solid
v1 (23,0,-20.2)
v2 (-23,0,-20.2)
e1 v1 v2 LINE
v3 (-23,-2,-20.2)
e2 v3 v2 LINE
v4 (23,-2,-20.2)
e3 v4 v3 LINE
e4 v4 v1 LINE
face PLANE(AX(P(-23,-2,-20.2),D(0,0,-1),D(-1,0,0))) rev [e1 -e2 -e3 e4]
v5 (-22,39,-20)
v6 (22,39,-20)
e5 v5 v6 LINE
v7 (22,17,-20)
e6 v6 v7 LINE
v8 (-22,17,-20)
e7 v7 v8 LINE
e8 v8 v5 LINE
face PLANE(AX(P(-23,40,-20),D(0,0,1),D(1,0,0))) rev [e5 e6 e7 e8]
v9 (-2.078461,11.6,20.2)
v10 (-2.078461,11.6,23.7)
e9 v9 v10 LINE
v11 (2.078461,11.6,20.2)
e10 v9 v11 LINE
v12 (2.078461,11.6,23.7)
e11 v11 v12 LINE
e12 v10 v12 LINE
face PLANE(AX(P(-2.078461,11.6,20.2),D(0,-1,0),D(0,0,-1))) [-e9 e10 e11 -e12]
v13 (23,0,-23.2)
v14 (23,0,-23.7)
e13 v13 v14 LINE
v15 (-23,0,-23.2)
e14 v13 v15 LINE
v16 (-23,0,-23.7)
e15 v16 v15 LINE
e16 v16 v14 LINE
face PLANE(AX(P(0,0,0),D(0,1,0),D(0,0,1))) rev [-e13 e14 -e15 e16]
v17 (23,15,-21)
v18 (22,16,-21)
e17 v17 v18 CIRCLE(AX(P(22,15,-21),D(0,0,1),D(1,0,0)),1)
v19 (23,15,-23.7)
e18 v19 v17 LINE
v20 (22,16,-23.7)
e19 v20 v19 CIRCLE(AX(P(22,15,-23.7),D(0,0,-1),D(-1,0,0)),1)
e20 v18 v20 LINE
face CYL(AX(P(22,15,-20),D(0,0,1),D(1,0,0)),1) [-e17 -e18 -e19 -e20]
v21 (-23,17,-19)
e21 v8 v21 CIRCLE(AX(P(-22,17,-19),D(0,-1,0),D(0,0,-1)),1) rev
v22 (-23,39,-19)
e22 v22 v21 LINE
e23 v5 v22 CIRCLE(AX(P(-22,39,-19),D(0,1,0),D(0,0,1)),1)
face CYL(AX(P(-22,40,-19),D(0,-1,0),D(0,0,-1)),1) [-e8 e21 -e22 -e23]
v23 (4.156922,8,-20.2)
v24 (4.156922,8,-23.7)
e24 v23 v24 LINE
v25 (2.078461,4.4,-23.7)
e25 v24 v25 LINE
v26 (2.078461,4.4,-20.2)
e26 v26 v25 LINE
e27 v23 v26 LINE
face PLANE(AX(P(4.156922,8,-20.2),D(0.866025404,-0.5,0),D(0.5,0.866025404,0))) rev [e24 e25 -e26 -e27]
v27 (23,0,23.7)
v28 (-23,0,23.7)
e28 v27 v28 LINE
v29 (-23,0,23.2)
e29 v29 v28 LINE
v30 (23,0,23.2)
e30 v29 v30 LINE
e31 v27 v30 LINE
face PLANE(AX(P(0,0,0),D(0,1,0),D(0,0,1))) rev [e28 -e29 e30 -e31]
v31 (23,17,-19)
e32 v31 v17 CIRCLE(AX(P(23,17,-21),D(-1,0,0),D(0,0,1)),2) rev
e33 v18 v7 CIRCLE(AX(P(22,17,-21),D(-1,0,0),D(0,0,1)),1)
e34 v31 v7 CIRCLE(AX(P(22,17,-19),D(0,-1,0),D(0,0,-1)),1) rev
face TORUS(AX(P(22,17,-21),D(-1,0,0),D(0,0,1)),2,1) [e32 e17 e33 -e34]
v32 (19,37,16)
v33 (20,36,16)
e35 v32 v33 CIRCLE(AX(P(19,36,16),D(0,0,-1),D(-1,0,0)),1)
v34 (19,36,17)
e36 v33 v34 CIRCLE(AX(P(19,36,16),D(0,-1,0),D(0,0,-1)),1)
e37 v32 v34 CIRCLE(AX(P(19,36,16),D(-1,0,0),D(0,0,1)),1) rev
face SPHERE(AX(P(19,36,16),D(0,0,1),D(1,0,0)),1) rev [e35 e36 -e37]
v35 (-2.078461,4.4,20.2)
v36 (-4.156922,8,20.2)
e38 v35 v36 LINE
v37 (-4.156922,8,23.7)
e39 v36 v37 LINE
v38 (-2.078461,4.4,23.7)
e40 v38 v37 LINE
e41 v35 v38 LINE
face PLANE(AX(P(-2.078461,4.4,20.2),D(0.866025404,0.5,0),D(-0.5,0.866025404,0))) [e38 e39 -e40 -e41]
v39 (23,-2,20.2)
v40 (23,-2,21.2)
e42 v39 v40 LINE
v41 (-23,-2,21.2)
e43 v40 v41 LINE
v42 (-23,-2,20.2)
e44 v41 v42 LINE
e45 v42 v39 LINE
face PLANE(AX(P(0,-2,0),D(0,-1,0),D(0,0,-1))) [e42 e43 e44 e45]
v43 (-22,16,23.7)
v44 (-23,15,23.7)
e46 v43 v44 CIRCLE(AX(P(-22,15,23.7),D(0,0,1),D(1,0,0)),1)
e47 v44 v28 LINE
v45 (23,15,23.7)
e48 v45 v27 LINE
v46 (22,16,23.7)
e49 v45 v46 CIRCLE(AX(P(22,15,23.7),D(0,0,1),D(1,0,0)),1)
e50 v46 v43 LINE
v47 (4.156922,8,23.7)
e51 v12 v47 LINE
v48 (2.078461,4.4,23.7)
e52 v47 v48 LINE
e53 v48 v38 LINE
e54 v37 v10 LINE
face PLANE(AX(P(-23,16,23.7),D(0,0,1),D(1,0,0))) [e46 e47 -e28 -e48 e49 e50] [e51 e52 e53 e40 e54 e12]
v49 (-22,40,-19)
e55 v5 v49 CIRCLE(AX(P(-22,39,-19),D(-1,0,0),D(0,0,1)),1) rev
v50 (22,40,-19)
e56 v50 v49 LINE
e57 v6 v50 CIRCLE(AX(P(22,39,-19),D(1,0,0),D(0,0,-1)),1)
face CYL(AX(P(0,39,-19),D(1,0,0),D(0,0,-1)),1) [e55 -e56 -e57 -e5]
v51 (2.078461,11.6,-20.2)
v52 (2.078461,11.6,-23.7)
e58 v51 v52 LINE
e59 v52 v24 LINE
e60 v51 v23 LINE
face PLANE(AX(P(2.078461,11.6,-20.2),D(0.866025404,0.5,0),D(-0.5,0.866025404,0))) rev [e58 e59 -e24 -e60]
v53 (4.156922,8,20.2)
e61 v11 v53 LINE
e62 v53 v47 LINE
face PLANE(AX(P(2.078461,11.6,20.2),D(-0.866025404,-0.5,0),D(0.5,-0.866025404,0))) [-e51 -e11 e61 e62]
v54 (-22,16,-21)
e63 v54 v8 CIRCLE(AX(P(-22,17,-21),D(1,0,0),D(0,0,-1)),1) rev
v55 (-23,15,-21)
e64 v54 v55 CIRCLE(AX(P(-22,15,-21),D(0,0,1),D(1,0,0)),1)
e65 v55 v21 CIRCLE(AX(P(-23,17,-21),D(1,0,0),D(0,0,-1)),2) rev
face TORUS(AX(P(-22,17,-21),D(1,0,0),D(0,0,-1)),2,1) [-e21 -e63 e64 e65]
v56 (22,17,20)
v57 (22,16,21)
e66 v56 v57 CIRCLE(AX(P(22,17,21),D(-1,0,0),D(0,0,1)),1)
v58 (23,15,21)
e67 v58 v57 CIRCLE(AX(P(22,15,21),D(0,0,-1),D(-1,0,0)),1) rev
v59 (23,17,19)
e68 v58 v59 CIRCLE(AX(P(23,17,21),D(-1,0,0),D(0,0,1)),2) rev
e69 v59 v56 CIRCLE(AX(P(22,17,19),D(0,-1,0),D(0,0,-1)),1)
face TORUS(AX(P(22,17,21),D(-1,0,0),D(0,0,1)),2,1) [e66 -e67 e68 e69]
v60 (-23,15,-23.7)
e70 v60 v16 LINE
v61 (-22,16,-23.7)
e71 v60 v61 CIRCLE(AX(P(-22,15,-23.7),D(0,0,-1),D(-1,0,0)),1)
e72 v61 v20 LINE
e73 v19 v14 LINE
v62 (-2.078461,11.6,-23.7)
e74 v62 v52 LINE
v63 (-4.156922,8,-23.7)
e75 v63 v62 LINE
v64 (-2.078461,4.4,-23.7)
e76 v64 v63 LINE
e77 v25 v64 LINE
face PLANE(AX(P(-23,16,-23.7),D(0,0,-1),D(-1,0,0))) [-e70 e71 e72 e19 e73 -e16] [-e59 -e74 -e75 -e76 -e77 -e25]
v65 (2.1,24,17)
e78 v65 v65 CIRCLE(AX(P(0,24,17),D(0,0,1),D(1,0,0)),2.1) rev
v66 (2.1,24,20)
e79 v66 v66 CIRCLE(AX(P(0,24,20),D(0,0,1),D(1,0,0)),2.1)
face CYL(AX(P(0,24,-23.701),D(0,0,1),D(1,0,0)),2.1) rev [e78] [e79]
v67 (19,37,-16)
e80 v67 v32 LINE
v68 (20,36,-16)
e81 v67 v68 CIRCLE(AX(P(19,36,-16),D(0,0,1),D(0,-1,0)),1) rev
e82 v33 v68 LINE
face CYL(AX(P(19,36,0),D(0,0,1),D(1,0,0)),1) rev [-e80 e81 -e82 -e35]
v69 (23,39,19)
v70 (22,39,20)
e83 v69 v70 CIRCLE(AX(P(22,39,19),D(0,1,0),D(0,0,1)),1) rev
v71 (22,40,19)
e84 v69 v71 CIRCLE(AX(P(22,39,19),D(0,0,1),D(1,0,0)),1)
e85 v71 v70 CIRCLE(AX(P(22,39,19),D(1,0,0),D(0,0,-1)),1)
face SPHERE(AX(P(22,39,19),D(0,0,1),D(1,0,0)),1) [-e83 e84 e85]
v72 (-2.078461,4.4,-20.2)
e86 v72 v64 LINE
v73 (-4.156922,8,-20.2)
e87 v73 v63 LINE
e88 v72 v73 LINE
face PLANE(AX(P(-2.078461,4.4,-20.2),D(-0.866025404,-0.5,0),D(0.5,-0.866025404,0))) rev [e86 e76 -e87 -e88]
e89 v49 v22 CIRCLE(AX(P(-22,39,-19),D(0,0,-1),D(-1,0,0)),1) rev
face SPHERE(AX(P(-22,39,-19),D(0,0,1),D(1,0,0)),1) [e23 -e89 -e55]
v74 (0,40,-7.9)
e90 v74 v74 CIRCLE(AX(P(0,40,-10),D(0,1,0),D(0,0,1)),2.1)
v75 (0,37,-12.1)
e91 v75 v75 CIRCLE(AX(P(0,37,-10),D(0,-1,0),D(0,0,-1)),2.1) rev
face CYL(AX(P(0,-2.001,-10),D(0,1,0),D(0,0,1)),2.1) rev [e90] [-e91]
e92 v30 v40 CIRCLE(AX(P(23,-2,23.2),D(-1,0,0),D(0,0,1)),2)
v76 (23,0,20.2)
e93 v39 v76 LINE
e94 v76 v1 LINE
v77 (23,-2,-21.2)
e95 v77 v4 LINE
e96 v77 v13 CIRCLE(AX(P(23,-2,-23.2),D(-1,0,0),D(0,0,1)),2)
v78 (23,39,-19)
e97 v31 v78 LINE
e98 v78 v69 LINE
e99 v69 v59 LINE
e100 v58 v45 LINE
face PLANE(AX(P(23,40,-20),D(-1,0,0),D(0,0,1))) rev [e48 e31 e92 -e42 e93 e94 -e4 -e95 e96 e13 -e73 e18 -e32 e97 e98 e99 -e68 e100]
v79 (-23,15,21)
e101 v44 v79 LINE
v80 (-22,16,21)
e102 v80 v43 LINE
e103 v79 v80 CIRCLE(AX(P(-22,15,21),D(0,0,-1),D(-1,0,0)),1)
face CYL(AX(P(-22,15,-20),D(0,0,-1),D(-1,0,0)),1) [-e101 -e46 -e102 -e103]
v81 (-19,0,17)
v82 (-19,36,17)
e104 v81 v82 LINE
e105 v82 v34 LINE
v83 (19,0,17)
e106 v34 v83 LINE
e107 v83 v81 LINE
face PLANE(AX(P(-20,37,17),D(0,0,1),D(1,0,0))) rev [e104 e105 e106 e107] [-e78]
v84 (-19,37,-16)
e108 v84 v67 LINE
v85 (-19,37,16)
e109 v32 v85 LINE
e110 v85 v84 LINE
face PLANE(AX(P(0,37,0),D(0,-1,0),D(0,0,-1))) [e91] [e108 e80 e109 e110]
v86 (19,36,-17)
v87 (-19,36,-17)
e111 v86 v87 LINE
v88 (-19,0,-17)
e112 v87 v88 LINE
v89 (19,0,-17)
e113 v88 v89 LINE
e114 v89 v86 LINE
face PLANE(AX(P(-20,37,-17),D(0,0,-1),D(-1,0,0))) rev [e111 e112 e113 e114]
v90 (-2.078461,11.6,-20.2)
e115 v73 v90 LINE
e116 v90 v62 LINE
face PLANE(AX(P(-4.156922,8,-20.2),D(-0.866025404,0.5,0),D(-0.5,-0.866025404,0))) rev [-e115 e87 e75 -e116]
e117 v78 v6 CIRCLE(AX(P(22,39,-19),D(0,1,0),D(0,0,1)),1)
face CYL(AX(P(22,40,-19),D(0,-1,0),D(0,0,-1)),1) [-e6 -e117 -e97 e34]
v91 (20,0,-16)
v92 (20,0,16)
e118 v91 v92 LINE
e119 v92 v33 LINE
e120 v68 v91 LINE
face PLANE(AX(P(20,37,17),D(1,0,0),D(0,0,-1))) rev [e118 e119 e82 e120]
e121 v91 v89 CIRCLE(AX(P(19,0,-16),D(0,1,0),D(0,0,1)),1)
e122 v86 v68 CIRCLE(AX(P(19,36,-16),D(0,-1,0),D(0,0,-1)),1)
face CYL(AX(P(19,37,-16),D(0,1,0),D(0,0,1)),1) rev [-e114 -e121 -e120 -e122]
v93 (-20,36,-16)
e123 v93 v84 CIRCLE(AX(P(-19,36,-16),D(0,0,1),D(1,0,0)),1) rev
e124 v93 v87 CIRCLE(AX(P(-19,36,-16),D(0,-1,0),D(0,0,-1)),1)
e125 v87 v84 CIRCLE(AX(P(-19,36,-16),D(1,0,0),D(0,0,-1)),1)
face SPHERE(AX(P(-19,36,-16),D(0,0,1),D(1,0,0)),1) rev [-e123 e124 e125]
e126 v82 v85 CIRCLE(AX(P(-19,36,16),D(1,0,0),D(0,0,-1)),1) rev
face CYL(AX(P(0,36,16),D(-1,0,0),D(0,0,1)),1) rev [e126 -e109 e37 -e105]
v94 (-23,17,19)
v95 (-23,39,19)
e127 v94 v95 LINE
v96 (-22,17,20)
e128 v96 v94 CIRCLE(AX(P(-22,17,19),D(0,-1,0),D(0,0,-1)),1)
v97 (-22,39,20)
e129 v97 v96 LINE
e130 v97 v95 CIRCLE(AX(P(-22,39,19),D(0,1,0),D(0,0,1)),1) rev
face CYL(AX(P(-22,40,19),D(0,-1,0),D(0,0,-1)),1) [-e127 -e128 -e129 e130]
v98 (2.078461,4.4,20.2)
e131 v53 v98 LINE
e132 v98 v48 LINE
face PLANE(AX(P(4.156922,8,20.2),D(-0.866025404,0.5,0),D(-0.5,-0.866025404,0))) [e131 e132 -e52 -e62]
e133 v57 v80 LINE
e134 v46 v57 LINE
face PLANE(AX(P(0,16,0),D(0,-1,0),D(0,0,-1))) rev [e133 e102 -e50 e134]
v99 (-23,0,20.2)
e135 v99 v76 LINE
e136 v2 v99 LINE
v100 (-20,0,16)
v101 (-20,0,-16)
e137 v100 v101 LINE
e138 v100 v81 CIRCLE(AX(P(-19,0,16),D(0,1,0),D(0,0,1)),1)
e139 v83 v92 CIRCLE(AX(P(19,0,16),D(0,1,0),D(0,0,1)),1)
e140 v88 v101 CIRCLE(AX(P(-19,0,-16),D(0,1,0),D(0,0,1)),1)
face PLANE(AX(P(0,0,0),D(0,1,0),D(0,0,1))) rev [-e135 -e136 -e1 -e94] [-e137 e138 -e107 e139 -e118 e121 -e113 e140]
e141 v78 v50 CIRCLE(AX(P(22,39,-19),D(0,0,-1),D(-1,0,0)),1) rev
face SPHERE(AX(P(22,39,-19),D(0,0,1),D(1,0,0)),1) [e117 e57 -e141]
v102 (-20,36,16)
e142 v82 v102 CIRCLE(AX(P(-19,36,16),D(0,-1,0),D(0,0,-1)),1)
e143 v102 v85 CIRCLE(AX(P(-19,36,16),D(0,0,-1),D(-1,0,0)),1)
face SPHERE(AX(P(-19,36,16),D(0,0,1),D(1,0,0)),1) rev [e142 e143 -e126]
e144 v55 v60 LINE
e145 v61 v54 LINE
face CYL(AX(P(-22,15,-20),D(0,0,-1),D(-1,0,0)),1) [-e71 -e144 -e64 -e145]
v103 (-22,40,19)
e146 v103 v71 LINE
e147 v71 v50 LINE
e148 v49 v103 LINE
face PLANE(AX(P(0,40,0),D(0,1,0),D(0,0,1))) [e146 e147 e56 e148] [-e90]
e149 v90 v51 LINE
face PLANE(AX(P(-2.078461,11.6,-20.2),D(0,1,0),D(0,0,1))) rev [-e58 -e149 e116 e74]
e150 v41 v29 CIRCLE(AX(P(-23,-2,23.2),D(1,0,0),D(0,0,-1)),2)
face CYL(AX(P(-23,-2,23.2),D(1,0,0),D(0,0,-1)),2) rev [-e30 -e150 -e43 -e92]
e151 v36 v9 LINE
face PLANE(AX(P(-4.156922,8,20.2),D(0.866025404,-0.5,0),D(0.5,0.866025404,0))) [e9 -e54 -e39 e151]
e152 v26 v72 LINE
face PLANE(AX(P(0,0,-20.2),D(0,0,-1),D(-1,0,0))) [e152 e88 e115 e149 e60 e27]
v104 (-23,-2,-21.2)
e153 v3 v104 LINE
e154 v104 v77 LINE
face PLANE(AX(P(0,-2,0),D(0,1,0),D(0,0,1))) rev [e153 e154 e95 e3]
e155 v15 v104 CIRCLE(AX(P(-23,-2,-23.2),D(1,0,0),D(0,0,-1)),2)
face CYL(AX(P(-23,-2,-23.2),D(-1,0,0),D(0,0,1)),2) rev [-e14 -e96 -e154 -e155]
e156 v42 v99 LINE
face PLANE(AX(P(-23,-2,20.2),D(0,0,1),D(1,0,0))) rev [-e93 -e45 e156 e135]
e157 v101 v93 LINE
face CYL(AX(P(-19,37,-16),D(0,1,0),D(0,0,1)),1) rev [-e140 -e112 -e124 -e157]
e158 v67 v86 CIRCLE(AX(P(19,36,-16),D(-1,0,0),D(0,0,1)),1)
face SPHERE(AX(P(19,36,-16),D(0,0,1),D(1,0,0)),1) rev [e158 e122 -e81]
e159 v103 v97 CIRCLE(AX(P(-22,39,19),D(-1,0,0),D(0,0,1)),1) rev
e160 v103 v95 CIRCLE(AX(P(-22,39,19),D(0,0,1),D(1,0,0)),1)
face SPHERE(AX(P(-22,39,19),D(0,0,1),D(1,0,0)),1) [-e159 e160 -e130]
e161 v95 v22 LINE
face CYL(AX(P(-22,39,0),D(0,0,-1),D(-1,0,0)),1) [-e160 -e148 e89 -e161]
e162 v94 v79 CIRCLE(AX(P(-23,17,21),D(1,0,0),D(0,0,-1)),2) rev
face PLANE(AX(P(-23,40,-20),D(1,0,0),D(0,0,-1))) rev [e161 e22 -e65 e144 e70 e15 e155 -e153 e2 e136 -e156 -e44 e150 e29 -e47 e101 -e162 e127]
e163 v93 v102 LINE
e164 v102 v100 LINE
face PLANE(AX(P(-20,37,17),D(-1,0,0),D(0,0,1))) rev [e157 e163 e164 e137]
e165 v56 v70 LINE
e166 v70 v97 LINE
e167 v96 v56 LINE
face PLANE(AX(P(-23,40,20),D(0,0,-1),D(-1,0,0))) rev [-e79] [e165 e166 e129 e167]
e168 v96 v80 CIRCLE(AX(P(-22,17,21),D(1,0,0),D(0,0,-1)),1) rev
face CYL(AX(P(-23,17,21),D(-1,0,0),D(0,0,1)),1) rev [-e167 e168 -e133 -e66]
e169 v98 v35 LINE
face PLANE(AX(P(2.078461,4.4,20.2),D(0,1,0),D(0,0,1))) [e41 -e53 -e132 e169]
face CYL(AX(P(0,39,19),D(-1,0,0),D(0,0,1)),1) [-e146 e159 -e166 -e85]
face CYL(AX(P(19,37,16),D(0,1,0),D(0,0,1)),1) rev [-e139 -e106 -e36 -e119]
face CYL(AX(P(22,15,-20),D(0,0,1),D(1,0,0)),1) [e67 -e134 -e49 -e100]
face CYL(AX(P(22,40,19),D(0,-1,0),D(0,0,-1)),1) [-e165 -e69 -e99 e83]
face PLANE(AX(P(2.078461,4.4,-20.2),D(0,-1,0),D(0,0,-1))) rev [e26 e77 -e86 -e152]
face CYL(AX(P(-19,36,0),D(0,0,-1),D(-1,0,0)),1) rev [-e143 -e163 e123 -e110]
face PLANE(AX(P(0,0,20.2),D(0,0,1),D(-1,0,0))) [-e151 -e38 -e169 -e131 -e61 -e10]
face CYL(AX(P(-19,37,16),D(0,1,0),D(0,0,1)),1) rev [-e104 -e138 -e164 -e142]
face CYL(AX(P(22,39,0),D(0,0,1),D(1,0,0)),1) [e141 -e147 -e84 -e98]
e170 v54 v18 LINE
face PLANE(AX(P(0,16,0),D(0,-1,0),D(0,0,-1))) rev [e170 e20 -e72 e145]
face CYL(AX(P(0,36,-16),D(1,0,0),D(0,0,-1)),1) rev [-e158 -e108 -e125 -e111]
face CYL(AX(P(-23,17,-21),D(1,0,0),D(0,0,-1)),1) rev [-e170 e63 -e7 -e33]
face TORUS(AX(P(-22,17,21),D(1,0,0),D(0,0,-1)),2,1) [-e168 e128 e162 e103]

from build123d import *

# Parameters (mm, degrees)
SKETCH1_W           = 46
SKETCH1_H           = 40
BOSS_EXTRUDE1_DEPTH = 40
SKETCH2_W           = 46
SKETCH2_H           = 3.7
BOSS_EXTRUDE2_DEPTH = 16
SKETCH5_W           = 40
SKETCH5_H           = 34
CUT_EXTRUDE3_DEPTH  = 37
FILLET1_R           = 1
FILLET2_R           = 1
CUT_EXTRUDE6_DEPTH  = 3.5
SKETCH9_W           = 46
SKETCH9_H           = 1
BOSS_EXTRUDE3_DEPTH = 2
CUT_EXTRUDE7_REACH  = 65.551
SKETCH12_R          = 2.1
CUT_EXTRUDE8_REACH  = 55.429
SKETCH13_R          = 2.1
FILLET3_R           = 2


with BuildPart() as part:
    # Sketch1 → Boss-Extrude1 (new body)
    with BuildSketch(Plane(origin=(0, 0, 0), x_dir=(1, 0, 0), z_dir=(0, 1, 0))):
        Rectangle(SKETCH1_W, SKETCH1_H)
    extrude(amount=BOSS_EXTRUDE1_DEPTH)

    # Sketch2 → Boss-Extrude2 (add)
    with BuildSketch(Plane.XZ):
        with Locations((0, 21.85)):
            Rectangle(SKETCH2_W, SKETCH2_H)
        with Locations((0, -21.85)):
            Rectangle(SKETCH2_W, SKETCH2_H)
    extrude(amount=-BOSS_EXTRUDE2_DEPTH)

    # Sketch5 → Cut-Extrude3 (cut)
    with BuildSketch(Plane.XZ):
        Rectangle(SKETCH5_W, SKETCH5_H)
    extrude(amount=-CUT_EXTRUDE3_DEPTH, mode=Mode.SUBTRACT)

    # Fillet1
    fillet1_edges = [part.edges().sort_by_distance(p)[0] for p in [
        (23, 40, 0),
        (0, 40, -20),
        (-23, 16, 21.85),
        (23, 16, 21.85),
        (0, 16, 20),
        (-23, 16, -21.85),
        (0, 16, -20),
        (23, 16, -21.85),
        (-23, 40, 0),
        (0, 40, 20),
        (-23, 28, -20),
        (23, 28, -20),
        (23, 28, 20),
        (-23, 28, 20),
    ]]
    fillet(fillet1_edges, radius=FILLET1_R)

    # Fillet2
    fillet2_edges = [part.edges().sort_by_distance(p)[0] for p in [
        (-20, 37, 0),
        (-20, 18.5, -17),
        (0, 37, 17),
        (-20, 18.5, 17),
        (20, 37, 0),
        (20, 18.5, 17),
        (0, 37, -17),
        (20, 18.5, -17),
    ]]
    fillet(fillet2_edges, radius=FILLET2_R)

    # Sketch3 → Cut-Extrude6 (cut)
    with BuildSketch(Plane(origin=(0, 0, -23.7), x_dir=(-1, 0, 0), z_dir=(0, 0, -1))):
        Polygon((2.078460969, 11.6), (-2.078460969, 11.6), (-4.156921938, 8), (-2.078460969, 4.4), (2.078460969, 4.4), (4.156921938, 8), align=None)
    cut_extrude6 = extrude(amount=-CUT_EXTRUDE6_DEPTH, mode=Mode.SUBTRACT)

    # Mirror2: Cut-Extrude6 across plane
    add(cut_extrude6.mirror(Plane.XY), mode=Mode.SUBTRACT)

    # Sketch9 → Boss-Extrude3 (add)
    with BuildSketch(Plane.XZ):
        with Locations((0, 20.7)):
            Rectangle(SKETCH9_W, SKETCH9_H)
        with Locations((0, -20.7)):
            Rectangle(SKETCH9_W, SKETCH9_H)
    extrude(amount=BOSS_EXTRUDE3_DEPTH)

    # Sketch12 → Cut-Extrude7 (cut, up to next)
    with BuildSketch(Plane.XY.offset(20), mode=Mode.PRIVATE) as cut_extrude7_sk1:
        with Locations((0, 24)):
            Circle(SKETCH12_R)
    cut_extrude7_tool1 = extrude(cut_extrude7_sk1.sketch, amount=-CUT_EXTRUDE7_REACH, mode=Mode.PRIVATE) & part.part
    add(cut_extrude7_tool1.solids().sort_by_distance((0, 24, 20))[0], mode=Mode.SUBTRACT)

    # Sketch13 → Cut-Extrude8 (cut, up to next)
    with BuildSketch(Plane(origin=(0, 40, 0), x_dir=(1, 0, 0), z_dir=(0, 1, 0)), mode=Mode.PRIVATE) as cut_extrude8_sk1:
        with Locations(Location((0, 10, 0), (0, 0, 270))):
            Circle(SKETCH13_R)
    cut_extrude8_tool1 = extrude(cut_extrude8_sk1.sketch, amount=-CUT_EXTRUDE8_REACH, mode=Mode.PRIVATE) & part.part
    add(cut_extrude8_tool1.solids().sort_by_distance((0, 40, -10))[0], mode=Mode.SUBTRACT)

    # Fillet3
    fillet3_edges = [part.edges().sort_by_distance(p)[0] for p in [
        (0, 0, 21.2),
        (0, 0, -21.2),
    ]]
    fillet(fillet3_edges, radius=FILLET3_R - 0.0001)  # a hair under: the kernel refuses the full size


solid = part.part
